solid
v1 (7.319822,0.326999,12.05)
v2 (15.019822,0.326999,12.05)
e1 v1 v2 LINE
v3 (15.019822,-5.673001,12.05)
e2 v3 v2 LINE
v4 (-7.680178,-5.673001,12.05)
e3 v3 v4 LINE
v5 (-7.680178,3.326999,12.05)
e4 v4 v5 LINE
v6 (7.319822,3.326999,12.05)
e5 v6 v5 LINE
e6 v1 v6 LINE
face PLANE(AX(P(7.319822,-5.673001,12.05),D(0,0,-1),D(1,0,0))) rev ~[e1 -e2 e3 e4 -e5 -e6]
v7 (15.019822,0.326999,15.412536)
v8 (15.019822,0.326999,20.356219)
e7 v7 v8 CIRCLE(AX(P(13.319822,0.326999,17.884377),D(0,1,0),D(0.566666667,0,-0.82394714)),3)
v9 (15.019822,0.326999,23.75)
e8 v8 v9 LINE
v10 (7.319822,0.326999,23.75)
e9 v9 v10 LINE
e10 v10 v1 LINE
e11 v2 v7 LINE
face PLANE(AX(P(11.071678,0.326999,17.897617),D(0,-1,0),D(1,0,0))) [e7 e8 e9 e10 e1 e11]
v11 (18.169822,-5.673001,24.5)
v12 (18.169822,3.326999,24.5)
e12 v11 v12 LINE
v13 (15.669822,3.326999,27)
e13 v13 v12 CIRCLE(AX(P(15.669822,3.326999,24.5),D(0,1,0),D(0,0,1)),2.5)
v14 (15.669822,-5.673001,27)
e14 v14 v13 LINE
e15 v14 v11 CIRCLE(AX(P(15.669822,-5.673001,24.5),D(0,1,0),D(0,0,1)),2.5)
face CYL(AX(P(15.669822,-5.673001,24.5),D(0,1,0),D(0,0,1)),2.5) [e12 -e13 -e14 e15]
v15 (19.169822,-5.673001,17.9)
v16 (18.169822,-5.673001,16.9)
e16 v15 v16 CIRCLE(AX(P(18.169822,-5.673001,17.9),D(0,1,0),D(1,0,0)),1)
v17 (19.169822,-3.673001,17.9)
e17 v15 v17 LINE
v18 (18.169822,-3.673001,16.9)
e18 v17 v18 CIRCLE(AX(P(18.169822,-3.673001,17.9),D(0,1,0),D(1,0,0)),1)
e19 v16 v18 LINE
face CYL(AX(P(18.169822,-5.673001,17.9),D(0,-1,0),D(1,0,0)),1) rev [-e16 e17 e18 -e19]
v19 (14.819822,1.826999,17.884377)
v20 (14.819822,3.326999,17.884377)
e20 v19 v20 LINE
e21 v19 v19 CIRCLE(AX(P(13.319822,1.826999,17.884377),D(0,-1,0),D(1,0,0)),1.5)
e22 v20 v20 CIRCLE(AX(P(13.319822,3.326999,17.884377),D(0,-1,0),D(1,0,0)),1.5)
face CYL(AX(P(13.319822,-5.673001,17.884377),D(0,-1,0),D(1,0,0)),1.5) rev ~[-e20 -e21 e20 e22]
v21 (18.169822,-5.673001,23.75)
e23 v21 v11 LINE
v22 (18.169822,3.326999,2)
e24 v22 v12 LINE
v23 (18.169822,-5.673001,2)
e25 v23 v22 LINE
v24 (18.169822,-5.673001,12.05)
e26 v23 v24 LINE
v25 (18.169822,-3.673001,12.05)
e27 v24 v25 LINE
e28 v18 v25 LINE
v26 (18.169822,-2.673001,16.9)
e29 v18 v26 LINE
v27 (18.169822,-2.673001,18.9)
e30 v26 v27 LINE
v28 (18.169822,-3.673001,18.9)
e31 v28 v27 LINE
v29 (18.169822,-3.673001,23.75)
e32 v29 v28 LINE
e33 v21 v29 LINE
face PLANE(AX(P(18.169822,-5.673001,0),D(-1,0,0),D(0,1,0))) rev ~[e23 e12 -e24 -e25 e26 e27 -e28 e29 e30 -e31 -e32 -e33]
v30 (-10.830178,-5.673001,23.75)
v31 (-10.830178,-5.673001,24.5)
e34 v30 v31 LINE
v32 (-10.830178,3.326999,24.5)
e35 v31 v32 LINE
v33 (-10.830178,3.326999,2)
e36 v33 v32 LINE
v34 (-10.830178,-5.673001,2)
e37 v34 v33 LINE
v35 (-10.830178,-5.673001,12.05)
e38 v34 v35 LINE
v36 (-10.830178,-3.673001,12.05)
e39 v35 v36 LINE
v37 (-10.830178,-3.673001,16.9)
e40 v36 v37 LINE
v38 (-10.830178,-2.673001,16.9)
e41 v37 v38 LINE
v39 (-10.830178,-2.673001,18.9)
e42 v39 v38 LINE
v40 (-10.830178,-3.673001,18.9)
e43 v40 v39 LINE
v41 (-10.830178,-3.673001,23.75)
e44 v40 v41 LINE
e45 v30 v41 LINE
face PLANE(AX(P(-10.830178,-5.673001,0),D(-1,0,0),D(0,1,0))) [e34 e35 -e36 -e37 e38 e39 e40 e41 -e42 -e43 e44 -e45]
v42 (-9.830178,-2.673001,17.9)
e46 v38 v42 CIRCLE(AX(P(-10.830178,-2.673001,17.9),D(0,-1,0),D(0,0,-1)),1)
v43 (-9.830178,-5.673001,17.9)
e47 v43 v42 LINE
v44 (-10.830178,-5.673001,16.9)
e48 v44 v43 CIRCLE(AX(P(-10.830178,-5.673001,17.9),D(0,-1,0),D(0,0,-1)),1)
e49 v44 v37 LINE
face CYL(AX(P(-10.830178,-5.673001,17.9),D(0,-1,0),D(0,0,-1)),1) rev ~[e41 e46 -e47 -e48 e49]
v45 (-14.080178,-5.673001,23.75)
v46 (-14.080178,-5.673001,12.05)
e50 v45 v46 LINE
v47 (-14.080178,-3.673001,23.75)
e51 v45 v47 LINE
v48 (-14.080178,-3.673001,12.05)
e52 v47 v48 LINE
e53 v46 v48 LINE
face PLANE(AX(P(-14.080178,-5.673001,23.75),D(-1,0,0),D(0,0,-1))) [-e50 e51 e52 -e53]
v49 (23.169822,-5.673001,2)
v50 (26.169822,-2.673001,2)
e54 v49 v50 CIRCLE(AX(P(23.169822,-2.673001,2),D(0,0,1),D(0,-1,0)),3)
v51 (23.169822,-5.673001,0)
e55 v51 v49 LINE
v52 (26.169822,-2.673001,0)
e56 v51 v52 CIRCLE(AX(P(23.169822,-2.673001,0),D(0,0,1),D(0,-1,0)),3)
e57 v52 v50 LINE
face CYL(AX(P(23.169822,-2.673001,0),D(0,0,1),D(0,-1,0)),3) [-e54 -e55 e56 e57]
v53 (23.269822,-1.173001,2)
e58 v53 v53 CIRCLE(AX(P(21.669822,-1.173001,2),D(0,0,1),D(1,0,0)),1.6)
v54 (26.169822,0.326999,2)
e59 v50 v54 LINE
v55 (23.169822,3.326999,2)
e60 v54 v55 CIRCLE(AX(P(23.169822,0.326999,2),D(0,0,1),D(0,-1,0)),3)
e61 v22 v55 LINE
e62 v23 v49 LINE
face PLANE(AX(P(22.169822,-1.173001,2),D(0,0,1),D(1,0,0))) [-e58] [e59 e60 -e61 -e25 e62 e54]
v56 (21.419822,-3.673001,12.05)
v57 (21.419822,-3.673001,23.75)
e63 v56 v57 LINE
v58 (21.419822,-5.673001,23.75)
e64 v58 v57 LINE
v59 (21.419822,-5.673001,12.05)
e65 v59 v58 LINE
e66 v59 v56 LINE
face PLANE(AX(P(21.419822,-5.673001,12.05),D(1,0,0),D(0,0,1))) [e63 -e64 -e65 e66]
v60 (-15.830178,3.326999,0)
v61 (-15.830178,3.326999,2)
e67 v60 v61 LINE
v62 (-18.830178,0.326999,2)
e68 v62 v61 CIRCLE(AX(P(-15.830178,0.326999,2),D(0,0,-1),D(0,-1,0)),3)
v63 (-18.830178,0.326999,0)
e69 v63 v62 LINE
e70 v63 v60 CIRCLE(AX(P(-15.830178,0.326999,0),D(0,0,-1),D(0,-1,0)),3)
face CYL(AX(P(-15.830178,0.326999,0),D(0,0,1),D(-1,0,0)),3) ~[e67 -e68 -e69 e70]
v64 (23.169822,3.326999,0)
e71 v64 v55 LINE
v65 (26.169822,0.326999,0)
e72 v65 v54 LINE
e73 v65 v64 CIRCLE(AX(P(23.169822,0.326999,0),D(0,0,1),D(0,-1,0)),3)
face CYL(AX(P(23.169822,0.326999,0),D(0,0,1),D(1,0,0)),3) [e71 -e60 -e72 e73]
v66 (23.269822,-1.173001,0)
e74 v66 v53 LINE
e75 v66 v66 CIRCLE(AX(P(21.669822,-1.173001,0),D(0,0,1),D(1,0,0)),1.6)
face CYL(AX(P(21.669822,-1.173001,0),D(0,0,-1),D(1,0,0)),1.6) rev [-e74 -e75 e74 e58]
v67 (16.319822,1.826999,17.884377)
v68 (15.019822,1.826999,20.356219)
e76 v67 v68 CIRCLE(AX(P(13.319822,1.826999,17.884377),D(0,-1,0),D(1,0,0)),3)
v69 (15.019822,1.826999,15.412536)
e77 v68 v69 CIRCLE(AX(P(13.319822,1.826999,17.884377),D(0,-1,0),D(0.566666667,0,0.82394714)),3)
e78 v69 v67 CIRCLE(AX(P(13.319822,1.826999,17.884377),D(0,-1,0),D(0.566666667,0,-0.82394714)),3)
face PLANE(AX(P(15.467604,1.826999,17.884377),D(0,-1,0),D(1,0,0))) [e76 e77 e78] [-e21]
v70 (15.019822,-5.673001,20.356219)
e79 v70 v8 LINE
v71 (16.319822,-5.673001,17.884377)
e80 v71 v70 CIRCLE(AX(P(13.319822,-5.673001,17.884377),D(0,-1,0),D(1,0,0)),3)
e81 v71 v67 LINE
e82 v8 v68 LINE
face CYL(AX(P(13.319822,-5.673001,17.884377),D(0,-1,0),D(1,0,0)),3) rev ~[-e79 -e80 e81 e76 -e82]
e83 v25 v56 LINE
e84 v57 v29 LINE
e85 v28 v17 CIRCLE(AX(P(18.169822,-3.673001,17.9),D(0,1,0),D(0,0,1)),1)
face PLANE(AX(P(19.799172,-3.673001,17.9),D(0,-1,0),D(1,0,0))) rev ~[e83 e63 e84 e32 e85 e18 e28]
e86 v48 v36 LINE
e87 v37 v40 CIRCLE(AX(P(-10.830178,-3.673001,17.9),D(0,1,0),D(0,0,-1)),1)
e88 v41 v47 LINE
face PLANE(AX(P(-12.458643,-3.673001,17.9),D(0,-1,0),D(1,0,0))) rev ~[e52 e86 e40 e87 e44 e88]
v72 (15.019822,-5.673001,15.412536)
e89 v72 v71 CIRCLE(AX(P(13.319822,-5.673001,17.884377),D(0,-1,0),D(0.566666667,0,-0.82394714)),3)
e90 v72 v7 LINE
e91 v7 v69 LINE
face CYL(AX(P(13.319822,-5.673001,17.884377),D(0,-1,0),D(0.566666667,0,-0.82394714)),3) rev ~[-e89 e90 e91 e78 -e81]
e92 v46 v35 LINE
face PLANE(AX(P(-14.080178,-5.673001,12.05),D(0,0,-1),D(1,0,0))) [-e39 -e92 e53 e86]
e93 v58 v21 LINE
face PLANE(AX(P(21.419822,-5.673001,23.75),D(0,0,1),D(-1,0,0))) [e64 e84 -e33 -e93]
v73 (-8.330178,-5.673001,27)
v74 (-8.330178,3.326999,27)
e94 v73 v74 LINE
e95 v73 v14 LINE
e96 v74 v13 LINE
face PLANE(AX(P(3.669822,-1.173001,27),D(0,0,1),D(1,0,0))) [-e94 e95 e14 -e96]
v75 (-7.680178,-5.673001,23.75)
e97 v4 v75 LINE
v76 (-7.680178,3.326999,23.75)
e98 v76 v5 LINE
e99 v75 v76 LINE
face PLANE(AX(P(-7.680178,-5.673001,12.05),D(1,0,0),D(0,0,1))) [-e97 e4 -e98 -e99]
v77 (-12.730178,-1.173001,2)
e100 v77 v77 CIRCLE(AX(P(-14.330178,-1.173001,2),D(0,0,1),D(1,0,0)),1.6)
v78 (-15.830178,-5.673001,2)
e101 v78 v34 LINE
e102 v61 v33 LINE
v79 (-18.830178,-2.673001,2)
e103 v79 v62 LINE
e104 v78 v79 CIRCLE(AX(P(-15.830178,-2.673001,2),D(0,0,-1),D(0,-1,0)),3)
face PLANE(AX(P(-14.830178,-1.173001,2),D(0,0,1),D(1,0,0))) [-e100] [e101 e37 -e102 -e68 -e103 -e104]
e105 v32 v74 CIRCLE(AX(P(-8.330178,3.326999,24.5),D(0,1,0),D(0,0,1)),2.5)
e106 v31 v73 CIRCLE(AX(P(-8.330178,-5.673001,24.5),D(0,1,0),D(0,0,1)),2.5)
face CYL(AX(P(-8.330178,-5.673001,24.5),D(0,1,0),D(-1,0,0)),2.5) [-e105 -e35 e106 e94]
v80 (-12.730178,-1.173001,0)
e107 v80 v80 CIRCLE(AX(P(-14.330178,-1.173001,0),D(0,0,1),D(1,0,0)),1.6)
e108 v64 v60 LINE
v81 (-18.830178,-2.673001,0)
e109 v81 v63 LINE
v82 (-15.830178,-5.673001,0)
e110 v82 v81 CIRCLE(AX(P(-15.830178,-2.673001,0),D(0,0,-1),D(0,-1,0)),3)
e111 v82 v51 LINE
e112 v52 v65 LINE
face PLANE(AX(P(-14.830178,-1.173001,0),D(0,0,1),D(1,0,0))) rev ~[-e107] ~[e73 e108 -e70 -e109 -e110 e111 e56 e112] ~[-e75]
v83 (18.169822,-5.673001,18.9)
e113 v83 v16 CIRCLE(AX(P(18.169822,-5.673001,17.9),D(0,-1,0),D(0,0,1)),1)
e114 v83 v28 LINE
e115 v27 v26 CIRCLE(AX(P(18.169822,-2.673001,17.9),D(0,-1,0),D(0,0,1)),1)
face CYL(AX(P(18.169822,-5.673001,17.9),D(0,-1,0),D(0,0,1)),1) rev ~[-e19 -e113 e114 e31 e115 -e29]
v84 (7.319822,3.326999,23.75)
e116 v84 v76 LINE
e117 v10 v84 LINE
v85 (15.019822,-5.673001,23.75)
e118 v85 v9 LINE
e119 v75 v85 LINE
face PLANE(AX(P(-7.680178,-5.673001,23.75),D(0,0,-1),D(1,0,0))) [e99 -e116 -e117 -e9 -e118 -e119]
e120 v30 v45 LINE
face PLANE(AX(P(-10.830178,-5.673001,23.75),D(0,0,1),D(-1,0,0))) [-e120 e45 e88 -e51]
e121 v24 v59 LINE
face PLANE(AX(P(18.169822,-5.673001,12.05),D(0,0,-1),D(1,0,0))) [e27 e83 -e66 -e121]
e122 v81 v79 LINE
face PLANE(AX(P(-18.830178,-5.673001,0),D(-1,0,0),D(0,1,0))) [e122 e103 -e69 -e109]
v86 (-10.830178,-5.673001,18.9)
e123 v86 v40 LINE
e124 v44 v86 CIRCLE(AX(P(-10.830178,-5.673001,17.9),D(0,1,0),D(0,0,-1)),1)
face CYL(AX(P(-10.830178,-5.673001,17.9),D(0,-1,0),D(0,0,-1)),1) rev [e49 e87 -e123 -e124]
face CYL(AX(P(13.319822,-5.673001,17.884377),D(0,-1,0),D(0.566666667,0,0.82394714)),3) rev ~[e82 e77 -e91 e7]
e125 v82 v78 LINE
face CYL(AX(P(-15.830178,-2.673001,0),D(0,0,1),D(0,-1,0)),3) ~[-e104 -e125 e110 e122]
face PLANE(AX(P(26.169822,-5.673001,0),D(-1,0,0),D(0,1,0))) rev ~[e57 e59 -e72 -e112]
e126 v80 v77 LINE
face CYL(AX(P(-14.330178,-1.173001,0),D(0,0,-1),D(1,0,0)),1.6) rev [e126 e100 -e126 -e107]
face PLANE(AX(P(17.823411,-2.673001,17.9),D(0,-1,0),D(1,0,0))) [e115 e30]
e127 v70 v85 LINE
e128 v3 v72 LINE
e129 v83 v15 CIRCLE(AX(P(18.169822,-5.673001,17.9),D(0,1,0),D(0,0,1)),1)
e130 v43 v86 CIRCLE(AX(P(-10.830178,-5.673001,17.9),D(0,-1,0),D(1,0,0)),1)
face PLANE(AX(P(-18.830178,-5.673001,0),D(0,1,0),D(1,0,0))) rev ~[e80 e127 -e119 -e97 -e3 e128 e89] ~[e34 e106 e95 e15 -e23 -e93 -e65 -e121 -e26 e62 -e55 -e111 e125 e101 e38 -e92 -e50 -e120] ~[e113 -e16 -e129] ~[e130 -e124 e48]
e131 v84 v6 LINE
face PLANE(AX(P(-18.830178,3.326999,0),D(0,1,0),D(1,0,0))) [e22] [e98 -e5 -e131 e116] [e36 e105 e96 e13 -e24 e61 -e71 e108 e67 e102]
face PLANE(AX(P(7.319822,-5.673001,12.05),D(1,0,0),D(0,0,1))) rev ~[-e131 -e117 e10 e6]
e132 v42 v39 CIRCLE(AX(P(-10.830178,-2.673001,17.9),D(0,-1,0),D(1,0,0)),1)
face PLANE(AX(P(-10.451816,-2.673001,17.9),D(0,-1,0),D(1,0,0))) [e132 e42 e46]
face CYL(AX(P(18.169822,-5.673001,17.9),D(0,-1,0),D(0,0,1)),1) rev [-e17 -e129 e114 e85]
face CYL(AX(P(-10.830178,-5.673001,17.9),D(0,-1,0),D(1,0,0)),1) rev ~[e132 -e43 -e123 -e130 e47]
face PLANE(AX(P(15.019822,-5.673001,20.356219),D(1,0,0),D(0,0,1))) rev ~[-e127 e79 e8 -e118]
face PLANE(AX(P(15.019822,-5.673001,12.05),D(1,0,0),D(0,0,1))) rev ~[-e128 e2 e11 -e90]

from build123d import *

# Parameters (mm, degrees)
F0_W      = 29
F0_H      = 9
F1_DEPTH  = 27
F0_W_2    = 8
F0_R      = 1.6
F2_DEPTH  = 2
F3_W      = 15
F3_H      = 11.7
F3_R      = 1.5
F4_DEPTH  = 10
F5_DEPTH  = 6
F6_DEPTH  = 7.5
F7_R      = 2.5
F8_R      = 3
F10_DEPTH = 2
F11_DEPTH = 3


# Not quite as in the source:
# - a feature names something its author has since deleted; it is built from what else it names


with BuildPart() as f1:
    # F0 (on Top) → F1 (new body)
    with BuildSketch(Plane.XY):
        with Locations((3.6698216572, -1.1730009172)):
            Rectangle(F0_W, F0_H)
    extrude(amount=F1_DEPTH)

    # F0 (on Top) → F2 (join)
    with BuildSketch(Plane.XY):
        with Locations((-14.8301783428, -1.1730009172)):
            Rectangle(F0_W_2, F0_H)
        with Locations((-14.3301783428, -1.1730009172)):
            Circle(F0_R, mode=Mode.SUBTRACT)
        with Locations((22.1698216572, -1.1730009172)):
            Rectangle(F0_W_2, F0_H)
        with Locations((21.6698216572, -1.1730009172)):
            Circle(F0_R, mode=Mode.SUBTRACT)
    extrude(amount=F2_DEPTH)

    # F3 (on face) → F4 (cut)
    with BuildSketch(Plane.XZ.offset(5.6730009172)):
        with Locations((-0.1801783428, 17.9)):
            Rectangle(F3_W, F3_H)
        with Locations((13.3198216572, 17.8843773901)):
            Circle(F3_R)
    extrude(amount=-F4_DEPTH, mode=Mode.SUBTRACT)

    # F3 (on face) → F5 (cut)
    with BuildSketch(Plane.XZ.offset(5.6730009172)):
        with BuildLine():
            Line((15.0198216572, 23.75), (7.3198216572, 23.75))
            Line((7.3198216572, 23.75), (7.3198216572, 12.05))
            Line((7.3198216572, 12.05), (15.0198216572, 12.05))
            Line((15.0198216572, 12.05), (15.0198216572, 15.4125359713))
            ThreePointArc((15.0198216572, 15.4125359713), (10.3198216572, 17.8843773901), (15.0198216572, 20.356218809))
            Line((15.0198216572, 20.356218809), (15.0198216572, 23.75))
        make_face()
    extrude(amount=-F5_DEPTH, mode=Mode.SUBTRACT)

    # F3 (on face) → F6 (cut)
    with BuildSketch(Plane.XZ.offset(5.6730009172)):
        with BuildLine():
            ThreePointArc((16.3198216572, 17.8843773901), (15.9750052667, 19.2808013945), (15.0198216572, 20.356218809))
            Line((15.0198216572, 20.356218809), (15.0198216572, 15.4125359713))
            ThreePointArc((15.0198216572, 15.4125359713), (15.9750052667, 16.4879533858), (16.3198216572, 17.8843773901))
        make_face()
        with BuildLine():
            Line((15.0198216572, 15.4125359713), (15.0198216572, 20.356218809))
            ThreePointArc((15.0198216572, 20.356218809), (10.3198216572, 17.8843773901), (15.0198216572, 15.4125359713))
        make_face()
        with Locations((13.3198216572, 17.8843773901)):
            Circle(F3_R, mode=Mode.SUBTRACT)
    extrude(amount=-F6_DEPTH, mode=Mode.SUBTRACT)

    # F7
    f7_edges = [f1.edges().sort_by_distance(p)[0] for p in [
        (-10.830178, -1.173001, 27),
        (18.169822, -1.173001, 27),
    ]]
    fillet(f7_edges, radius=F7_R)

    # F8
    f8_edges = [f1.edges().sort_by_distance(p)[0] for p in [
        (-18.830178, 3.326999, 1),
        (-18.830178, -5.673001, 1),
        (26.169822, -5.673001, 1),
        (26.169822, 3.326999, 1),
    ]]
    fillet(f8_edges, radius=F8_R)

    # F9 (on face) → F10 (join)
    with BuildSketch(Plane.XZ.offset(5.6730009172)):
        with BuildLine():
            Line((-14.0801783428, 12.05), (-10.8301783428, 12.05))
            Line((-10.8301783428, 12.05), (-10.8301783428, 16.9))
            ThreePointArc((-10.8301783428, 16.9), (-11.8301783428, 17.9), (-10.8301783428, 18.9))
            Line((-10.8301783428, 18.9), (-10.8301783428, 23.75))
            Line((-10.8301783428, 23.75), (-14.0801783428, 23.75))
            Line((-14.0801783428, 23.75), (-14.0801783428, 12.05))
        make_face()
        with BuildLine():
            Line((18.1698216572, 16.9), (18.1698216572, 12.05))
            Line((18.1698216572, 12.05), (21.4198216572, 12.05))
            Line((21.4198216572, 12.05), (21.4198216572, 23.75))
            Line((21.4198216572, 23.75), (18.1698216572, 23.75))
            Line((18.1698216572, 23.75), (18.1698216572, 18.9))
            ThreePointArc((18.1698216572, 18.9), (18.8769284384, 18.6071067812), (19.1698216572, 17.9))
            ThreePointArc((19.1698216572, 17.9), (18.8769284384, 17.1928932188), (18.1698216572, 16.9))
        make_face()
    extrude(amount=-F10_DEPTH)

    # F9 (on face) → F11 (cut)
    with BuildSketch(Plane.XZ.offset(5.6730009172)):
        with BuildLine():
            Line((-10.8301783428, 18.9), (-10.8301783428, 16.9))
            ThreePointArc((-10.8301783428, 16.9), (-10.1230715616, 17.1928932188), (-9.8301783428, 17.9))
            ThreePointArc((-9.8301783428, 17.9), (-10.1230715616, 18.6071067812), (-10.8301783428, 18.9))
        make_face()
        with BuildLine():
            ThreePointArc((18.1698216572, 18.9), (17.1698216572, 17.9), (18.1698216572, 16.9))
            Line((18.1698216572, 16.9), (18.1698216572, 18.9))
        make_face()
    extrude(amount=-F11_DEPTH, mode=Mode.SUBTRACT)


solid = f1.part
